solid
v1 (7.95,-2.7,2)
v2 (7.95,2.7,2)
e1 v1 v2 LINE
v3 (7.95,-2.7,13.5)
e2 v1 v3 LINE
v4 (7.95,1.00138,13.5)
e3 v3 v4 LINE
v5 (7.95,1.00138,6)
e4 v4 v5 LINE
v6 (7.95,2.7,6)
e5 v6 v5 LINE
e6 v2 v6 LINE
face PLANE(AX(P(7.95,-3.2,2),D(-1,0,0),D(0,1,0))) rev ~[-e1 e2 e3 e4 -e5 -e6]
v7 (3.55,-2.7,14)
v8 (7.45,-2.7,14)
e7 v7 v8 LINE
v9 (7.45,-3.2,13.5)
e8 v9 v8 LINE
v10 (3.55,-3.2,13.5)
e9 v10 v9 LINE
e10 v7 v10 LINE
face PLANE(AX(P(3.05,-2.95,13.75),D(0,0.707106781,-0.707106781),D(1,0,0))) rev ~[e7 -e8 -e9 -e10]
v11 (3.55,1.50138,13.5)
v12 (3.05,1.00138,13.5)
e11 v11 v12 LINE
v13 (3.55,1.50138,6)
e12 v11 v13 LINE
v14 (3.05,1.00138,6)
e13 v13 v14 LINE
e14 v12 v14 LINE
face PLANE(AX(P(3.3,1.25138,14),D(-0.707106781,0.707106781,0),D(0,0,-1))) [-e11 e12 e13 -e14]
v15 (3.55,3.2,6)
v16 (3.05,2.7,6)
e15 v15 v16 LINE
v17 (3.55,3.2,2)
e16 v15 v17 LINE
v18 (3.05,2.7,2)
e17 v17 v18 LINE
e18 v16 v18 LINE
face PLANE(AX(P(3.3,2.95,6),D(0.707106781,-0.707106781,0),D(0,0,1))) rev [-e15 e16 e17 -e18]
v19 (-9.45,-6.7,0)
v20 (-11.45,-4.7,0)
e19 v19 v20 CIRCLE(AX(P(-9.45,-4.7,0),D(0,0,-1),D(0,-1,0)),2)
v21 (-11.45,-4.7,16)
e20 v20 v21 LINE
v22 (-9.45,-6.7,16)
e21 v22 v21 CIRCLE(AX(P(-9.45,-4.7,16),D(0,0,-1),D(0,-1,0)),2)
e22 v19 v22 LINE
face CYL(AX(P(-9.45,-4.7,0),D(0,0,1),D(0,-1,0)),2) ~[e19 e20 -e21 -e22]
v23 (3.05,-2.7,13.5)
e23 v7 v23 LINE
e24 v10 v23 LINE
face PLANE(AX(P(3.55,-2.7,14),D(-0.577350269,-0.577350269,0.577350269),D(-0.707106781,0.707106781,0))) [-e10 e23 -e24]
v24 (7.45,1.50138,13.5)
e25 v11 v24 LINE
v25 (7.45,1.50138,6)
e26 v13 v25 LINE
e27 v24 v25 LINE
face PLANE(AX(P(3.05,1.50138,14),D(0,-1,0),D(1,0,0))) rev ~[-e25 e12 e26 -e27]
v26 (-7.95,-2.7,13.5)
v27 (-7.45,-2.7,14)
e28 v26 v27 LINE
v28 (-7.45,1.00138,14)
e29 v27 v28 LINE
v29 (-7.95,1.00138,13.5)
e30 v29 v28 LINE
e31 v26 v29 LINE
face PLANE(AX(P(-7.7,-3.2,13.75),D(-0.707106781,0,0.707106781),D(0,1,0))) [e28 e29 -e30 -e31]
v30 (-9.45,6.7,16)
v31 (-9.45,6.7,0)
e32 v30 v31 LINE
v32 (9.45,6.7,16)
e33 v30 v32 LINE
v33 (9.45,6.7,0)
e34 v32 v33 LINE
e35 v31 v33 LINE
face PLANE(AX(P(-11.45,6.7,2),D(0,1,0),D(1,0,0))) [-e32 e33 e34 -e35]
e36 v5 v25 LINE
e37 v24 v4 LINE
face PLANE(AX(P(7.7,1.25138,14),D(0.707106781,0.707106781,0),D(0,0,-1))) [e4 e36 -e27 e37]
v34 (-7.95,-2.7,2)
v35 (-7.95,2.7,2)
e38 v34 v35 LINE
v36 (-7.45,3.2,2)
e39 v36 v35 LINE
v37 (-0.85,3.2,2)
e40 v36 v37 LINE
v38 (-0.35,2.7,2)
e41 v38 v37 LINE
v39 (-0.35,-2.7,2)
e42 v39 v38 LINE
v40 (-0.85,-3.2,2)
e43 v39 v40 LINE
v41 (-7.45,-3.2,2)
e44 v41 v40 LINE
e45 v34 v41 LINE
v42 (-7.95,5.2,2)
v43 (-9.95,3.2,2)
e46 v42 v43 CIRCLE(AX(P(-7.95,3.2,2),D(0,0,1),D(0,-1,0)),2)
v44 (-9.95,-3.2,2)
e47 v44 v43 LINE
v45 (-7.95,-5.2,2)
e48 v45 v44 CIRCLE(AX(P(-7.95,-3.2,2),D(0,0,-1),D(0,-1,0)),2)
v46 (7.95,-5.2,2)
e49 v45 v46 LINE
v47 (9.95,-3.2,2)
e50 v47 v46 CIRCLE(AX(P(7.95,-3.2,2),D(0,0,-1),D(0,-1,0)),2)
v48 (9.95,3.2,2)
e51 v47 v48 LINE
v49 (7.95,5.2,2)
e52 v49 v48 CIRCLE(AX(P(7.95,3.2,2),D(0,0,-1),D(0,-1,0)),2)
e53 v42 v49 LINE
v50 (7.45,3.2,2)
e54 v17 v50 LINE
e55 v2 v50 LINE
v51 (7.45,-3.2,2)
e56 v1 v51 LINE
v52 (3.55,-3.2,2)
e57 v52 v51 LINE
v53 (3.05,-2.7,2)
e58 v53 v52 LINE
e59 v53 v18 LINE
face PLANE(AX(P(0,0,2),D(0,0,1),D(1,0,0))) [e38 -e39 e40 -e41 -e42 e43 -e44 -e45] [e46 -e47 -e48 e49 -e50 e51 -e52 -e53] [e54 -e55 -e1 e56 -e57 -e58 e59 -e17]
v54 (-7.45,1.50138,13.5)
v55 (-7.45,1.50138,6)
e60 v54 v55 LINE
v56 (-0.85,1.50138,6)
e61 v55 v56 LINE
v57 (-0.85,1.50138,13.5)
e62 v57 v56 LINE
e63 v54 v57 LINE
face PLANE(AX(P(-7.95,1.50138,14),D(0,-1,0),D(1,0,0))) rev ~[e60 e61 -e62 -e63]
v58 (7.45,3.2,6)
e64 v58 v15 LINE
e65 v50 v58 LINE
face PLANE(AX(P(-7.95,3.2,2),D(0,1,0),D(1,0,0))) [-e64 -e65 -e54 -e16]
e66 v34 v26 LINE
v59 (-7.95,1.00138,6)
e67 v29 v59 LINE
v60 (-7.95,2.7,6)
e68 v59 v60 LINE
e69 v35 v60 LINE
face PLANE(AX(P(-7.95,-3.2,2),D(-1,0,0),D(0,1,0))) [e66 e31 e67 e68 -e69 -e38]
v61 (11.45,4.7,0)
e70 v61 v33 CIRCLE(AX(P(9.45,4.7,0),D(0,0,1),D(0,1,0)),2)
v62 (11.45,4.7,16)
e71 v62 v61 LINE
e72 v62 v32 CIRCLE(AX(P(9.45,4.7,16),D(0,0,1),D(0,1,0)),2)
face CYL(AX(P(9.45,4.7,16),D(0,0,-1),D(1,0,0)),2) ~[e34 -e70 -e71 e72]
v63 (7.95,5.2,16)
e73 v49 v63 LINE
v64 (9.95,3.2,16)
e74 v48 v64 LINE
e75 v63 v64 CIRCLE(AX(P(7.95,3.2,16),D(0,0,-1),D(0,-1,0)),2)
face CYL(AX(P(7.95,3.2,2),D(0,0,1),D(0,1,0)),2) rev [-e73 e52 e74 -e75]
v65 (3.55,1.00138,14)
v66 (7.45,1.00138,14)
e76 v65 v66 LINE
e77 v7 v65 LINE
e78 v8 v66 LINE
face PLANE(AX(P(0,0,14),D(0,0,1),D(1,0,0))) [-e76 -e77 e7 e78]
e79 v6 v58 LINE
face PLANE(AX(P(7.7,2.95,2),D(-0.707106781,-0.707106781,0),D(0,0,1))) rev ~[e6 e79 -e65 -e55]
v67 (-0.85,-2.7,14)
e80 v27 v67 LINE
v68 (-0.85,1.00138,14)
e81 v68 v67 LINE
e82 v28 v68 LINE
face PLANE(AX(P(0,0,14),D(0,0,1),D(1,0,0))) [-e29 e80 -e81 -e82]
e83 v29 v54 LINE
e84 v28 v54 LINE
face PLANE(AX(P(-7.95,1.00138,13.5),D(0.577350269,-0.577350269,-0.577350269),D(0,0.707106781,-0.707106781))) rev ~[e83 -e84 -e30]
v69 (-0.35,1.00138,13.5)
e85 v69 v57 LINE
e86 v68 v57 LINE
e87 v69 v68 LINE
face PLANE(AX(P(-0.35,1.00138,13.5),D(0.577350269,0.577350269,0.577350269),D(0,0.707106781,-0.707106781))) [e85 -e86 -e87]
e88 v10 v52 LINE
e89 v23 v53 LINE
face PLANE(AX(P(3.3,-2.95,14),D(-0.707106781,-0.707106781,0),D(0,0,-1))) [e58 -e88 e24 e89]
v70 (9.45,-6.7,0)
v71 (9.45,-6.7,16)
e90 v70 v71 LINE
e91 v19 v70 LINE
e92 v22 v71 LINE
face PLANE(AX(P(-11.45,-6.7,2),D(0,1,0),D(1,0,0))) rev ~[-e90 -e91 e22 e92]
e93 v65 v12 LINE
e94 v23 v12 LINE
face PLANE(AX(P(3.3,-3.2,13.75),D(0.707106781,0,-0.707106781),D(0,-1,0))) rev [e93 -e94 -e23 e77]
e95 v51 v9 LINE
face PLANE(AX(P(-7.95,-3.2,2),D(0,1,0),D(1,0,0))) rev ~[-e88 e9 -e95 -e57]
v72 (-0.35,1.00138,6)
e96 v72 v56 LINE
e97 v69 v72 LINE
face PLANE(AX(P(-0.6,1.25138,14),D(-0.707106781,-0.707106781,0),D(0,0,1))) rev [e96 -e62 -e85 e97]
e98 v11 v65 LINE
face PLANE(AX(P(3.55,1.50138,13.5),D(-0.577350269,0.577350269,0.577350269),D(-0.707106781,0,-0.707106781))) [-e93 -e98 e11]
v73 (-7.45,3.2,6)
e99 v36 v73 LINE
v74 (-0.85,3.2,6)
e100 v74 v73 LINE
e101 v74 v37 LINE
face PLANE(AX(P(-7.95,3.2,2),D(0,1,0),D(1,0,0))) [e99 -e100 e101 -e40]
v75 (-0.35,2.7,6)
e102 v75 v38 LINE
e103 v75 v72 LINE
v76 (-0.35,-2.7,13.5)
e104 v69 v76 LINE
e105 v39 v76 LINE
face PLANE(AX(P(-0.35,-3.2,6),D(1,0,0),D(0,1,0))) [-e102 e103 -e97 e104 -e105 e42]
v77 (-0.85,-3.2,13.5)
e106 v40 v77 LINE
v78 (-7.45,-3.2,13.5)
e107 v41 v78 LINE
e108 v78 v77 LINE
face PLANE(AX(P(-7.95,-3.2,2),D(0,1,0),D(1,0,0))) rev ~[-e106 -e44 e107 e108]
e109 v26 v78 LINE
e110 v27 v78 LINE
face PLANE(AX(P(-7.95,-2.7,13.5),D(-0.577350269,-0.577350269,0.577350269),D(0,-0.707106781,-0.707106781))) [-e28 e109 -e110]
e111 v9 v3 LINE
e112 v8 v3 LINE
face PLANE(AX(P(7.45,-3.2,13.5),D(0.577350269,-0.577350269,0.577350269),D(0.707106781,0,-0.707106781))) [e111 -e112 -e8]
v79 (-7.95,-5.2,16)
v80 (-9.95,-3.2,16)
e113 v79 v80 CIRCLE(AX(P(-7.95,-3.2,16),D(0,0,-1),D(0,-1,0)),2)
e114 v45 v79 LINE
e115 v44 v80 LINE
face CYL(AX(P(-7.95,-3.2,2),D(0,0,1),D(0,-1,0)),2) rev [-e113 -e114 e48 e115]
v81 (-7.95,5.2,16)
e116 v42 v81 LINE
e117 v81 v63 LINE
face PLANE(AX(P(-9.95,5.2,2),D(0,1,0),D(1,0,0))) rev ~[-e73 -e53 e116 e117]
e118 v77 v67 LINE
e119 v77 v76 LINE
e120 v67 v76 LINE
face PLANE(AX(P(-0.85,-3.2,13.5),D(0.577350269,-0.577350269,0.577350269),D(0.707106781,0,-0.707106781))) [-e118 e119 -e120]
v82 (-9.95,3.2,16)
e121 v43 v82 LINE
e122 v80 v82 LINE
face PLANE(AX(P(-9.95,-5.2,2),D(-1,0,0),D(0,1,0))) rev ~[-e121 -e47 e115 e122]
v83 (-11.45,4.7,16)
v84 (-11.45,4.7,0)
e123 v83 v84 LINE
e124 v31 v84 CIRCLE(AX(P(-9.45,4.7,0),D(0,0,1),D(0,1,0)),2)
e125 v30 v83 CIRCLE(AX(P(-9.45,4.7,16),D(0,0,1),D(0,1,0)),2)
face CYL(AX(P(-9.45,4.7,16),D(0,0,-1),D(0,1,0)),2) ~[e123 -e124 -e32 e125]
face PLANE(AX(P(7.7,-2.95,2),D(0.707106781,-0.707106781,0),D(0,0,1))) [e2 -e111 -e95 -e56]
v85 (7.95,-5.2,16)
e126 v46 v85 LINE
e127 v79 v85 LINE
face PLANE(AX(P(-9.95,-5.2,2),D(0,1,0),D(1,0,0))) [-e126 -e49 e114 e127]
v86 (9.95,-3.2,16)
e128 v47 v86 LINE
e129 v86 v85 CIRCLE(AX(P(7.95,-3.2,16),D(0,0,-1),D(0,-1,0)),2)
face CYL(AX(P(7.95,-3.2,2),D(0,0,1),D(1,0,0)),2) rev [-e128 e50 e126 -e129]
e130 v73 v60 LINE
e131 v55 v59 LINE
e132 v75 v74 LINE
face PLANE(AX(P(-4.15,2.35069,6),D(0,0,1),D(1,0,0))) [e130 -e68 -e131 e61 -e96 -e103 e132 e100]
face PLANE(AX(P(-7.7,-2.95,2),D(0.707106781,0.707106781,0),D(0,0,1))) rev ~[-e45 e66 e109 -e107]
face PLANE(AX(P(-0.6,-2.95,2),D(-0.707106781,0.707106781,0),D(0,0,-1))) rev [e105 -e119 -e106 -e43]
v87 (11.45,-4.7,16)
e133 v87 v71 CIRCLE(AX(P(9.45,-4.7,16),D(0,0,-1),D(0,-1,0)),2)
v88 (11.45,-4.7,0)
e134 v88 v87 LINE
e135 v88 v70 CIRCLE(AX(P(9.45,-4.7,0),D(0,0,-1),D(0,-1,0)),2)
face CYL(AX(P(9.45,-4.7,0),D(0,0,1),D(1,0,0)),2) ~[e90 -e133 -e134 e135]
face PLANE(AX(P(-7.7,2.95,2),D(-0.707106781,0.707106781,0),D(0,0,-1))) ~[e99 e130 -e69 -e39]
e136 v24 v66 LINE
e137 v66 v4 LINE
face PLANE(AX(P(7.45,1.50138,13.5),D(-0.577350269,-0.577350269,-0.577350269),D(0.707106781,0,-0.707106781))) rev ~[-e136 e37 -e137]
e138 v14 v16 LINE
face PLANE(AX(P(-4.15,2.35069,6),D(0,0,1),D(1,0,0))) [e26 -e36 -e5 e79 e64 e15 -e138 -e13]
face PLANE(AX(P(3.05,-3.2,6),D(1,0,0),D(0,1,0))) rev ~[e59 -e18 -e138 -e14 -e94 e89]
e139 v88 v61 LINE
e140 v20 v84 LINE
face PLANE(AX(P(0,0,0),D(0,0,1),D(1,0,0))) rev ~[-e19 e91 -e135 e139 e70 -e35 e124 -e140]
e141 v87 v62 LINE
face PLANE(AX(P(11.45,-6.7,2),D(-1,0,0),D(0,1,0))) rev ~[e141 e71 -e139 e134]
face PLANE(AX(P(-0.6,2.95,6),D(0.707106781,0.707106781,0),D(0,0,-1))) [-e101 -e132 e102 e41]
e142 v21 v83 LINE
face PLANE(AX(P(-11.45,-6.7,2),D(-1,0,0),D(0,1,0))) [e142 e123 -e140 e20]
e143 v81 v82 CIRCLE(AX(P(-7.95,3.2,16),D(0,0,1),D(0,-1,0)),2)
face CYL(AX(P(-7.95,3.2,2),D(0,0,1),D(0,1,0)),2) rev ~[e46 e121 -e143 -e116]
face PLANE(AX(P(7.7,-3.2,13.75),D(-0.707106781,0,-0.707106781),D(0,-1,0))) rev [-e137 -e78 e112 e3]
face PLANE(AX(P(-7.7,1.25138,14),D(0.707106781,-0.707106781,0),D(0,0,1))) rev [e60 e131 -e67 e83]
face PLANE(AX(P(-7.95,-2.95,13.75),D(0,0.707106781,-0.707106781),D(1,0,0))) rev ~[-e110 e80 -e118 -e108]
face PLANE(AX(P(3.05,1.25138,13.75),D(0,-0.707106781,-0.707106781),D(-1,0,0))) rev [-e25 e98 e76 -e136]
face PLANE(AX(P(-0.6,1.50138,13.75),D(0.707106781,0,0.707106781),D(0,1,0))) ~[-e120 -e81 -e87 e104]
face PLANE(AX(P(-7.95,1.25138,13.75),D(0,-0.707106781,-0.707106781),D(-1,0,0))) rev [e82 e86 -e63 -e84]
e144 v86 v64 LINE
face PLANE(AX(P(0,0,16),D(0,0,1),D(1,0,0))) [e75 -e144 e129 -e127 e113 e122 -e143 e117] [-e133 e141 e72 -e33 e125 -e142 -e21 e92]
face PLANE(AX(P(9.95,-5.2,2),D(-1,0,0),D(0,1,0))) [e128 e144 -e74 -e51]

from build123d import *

# Parameters (mm, degrees)
F0_W     = 22.9
F0_H     = 13.4
F1_DEPTH = 2
F2_W     = 22.9
F2_H     = 13.4
F2_W_2   = 19.9
F2_H_2   = 10.4
F3_DEPTH = 14
F4_W     = 15.9
F4_H     = 6.4
F5_DEPTH = 12
F6_W     = 7.6
F6_H     = 1.698620432
F6_W_2   = 4.9
F7_DEPTH = 8
F8_W     = 3.4
F8_H     = 6.4
F9_DEPTH = 4
F10_SIZE = 0.5
F11_R    = 2


with BuildPart() as f1:
    # F0 (on Top) → F1 (new body)
    with BuildSketch(Plane.XY):
        Rectangle(F0_W, F0_H)
    extrude(amount=F1_DEPTH)

    # F2 (on face) → F3 (join)
    with BuildSketch(Plane.XY.offset(2)):
        Rectangle(F2_W, F2_H)
        Rectangle(F2_W_2, F2_H_2, mode=Mode.SUBTRACT)
    extrude(amount=F3_DEPTH)

    # F4 (on face) → F5 (join)
    with BuildSketch(Plane.XY.offset(2)):
        Rectangle(F4_W, F4_H)
    extrude(amount=F5_DEPTH)

    # F6 (on face) → F7 (cut)
    with BuildSketch(Plane.XY.offset(14)):
        with Locations((-4.15, 2.350689784)):
            Rectangle(F6_W, F6_H)
        Polygon((-0.35, 3.2), (-0.35, 1.501379568), (-0.35, -3.2), (3.05, -3.2), (3.05, 1.501379568), (3.05, 3.2), align=None)
        with Locations((5.5, 2.350689784)):
            Rectangle(F6_W_2, F6_H)
    extrude(amount=-F7_DEPTH, mode=Mode.SUBTRACT)

    # F8 (on face) → F9 (cut)
    with BuildSketch(Plane.XY.offset(6)):
        with Locations((1.35, 0)):
            Rectangle(F8_W, F8_H)
    extrude(amount=-F9_DEPTH, mode=Mode.SUBTRACT)

    # F10
    f10_edges = [f1.edges().sort_by_distance(p)[0] for p in [
        (-4.15, 1.50138, 14),
        (-0.35, -0.84931, 14),
        (-4.15, -3.2, 14),
        (-7.95, -0.84931, 14),
        (-7.95, 1.50138, 10),
        (-0.35, 1.50138, 10),
        (-0.35, -3.2, 8),
        (3.05, -3.2, 8),
        (7.95, -0.84931, 14),
        (5.5, -3.2, 14),
        (3.05, -0.84931, 14),
        (5.5, 1.50138, 14),
        (7.95, 1.50138, 10),
        (3.05, 1.50138, 10),
        (3.05, 3.2, 4),
        (7.95, 3.2, 4),
        (7.95, -3.2, 8),
        (-0.35, 3.2, 4),
        (-7.95, 3.2, 4),
        (-7.95, -3.2, 8),
    ]]
    chamfer(f10_edges, length=F10_SIZE)

    # F11
    f11_edges = [f1.edges().sort_by_distance(p)[0] for p in [
        (9.95, -5.2, 9),
        (9.95, 5.2, 9),
        (-9.95, 5.2, 9),
        (-9.95, -5.2, 9),
        (11.45, -6.7, 8),
        (11.45, 6.7, 8),
        (-11.45, 6.7, 8),
        (-11.45, -6.7, 8),
    ]]
    fillet(f11_edges, radius=F11_R)


solid = f1.part
